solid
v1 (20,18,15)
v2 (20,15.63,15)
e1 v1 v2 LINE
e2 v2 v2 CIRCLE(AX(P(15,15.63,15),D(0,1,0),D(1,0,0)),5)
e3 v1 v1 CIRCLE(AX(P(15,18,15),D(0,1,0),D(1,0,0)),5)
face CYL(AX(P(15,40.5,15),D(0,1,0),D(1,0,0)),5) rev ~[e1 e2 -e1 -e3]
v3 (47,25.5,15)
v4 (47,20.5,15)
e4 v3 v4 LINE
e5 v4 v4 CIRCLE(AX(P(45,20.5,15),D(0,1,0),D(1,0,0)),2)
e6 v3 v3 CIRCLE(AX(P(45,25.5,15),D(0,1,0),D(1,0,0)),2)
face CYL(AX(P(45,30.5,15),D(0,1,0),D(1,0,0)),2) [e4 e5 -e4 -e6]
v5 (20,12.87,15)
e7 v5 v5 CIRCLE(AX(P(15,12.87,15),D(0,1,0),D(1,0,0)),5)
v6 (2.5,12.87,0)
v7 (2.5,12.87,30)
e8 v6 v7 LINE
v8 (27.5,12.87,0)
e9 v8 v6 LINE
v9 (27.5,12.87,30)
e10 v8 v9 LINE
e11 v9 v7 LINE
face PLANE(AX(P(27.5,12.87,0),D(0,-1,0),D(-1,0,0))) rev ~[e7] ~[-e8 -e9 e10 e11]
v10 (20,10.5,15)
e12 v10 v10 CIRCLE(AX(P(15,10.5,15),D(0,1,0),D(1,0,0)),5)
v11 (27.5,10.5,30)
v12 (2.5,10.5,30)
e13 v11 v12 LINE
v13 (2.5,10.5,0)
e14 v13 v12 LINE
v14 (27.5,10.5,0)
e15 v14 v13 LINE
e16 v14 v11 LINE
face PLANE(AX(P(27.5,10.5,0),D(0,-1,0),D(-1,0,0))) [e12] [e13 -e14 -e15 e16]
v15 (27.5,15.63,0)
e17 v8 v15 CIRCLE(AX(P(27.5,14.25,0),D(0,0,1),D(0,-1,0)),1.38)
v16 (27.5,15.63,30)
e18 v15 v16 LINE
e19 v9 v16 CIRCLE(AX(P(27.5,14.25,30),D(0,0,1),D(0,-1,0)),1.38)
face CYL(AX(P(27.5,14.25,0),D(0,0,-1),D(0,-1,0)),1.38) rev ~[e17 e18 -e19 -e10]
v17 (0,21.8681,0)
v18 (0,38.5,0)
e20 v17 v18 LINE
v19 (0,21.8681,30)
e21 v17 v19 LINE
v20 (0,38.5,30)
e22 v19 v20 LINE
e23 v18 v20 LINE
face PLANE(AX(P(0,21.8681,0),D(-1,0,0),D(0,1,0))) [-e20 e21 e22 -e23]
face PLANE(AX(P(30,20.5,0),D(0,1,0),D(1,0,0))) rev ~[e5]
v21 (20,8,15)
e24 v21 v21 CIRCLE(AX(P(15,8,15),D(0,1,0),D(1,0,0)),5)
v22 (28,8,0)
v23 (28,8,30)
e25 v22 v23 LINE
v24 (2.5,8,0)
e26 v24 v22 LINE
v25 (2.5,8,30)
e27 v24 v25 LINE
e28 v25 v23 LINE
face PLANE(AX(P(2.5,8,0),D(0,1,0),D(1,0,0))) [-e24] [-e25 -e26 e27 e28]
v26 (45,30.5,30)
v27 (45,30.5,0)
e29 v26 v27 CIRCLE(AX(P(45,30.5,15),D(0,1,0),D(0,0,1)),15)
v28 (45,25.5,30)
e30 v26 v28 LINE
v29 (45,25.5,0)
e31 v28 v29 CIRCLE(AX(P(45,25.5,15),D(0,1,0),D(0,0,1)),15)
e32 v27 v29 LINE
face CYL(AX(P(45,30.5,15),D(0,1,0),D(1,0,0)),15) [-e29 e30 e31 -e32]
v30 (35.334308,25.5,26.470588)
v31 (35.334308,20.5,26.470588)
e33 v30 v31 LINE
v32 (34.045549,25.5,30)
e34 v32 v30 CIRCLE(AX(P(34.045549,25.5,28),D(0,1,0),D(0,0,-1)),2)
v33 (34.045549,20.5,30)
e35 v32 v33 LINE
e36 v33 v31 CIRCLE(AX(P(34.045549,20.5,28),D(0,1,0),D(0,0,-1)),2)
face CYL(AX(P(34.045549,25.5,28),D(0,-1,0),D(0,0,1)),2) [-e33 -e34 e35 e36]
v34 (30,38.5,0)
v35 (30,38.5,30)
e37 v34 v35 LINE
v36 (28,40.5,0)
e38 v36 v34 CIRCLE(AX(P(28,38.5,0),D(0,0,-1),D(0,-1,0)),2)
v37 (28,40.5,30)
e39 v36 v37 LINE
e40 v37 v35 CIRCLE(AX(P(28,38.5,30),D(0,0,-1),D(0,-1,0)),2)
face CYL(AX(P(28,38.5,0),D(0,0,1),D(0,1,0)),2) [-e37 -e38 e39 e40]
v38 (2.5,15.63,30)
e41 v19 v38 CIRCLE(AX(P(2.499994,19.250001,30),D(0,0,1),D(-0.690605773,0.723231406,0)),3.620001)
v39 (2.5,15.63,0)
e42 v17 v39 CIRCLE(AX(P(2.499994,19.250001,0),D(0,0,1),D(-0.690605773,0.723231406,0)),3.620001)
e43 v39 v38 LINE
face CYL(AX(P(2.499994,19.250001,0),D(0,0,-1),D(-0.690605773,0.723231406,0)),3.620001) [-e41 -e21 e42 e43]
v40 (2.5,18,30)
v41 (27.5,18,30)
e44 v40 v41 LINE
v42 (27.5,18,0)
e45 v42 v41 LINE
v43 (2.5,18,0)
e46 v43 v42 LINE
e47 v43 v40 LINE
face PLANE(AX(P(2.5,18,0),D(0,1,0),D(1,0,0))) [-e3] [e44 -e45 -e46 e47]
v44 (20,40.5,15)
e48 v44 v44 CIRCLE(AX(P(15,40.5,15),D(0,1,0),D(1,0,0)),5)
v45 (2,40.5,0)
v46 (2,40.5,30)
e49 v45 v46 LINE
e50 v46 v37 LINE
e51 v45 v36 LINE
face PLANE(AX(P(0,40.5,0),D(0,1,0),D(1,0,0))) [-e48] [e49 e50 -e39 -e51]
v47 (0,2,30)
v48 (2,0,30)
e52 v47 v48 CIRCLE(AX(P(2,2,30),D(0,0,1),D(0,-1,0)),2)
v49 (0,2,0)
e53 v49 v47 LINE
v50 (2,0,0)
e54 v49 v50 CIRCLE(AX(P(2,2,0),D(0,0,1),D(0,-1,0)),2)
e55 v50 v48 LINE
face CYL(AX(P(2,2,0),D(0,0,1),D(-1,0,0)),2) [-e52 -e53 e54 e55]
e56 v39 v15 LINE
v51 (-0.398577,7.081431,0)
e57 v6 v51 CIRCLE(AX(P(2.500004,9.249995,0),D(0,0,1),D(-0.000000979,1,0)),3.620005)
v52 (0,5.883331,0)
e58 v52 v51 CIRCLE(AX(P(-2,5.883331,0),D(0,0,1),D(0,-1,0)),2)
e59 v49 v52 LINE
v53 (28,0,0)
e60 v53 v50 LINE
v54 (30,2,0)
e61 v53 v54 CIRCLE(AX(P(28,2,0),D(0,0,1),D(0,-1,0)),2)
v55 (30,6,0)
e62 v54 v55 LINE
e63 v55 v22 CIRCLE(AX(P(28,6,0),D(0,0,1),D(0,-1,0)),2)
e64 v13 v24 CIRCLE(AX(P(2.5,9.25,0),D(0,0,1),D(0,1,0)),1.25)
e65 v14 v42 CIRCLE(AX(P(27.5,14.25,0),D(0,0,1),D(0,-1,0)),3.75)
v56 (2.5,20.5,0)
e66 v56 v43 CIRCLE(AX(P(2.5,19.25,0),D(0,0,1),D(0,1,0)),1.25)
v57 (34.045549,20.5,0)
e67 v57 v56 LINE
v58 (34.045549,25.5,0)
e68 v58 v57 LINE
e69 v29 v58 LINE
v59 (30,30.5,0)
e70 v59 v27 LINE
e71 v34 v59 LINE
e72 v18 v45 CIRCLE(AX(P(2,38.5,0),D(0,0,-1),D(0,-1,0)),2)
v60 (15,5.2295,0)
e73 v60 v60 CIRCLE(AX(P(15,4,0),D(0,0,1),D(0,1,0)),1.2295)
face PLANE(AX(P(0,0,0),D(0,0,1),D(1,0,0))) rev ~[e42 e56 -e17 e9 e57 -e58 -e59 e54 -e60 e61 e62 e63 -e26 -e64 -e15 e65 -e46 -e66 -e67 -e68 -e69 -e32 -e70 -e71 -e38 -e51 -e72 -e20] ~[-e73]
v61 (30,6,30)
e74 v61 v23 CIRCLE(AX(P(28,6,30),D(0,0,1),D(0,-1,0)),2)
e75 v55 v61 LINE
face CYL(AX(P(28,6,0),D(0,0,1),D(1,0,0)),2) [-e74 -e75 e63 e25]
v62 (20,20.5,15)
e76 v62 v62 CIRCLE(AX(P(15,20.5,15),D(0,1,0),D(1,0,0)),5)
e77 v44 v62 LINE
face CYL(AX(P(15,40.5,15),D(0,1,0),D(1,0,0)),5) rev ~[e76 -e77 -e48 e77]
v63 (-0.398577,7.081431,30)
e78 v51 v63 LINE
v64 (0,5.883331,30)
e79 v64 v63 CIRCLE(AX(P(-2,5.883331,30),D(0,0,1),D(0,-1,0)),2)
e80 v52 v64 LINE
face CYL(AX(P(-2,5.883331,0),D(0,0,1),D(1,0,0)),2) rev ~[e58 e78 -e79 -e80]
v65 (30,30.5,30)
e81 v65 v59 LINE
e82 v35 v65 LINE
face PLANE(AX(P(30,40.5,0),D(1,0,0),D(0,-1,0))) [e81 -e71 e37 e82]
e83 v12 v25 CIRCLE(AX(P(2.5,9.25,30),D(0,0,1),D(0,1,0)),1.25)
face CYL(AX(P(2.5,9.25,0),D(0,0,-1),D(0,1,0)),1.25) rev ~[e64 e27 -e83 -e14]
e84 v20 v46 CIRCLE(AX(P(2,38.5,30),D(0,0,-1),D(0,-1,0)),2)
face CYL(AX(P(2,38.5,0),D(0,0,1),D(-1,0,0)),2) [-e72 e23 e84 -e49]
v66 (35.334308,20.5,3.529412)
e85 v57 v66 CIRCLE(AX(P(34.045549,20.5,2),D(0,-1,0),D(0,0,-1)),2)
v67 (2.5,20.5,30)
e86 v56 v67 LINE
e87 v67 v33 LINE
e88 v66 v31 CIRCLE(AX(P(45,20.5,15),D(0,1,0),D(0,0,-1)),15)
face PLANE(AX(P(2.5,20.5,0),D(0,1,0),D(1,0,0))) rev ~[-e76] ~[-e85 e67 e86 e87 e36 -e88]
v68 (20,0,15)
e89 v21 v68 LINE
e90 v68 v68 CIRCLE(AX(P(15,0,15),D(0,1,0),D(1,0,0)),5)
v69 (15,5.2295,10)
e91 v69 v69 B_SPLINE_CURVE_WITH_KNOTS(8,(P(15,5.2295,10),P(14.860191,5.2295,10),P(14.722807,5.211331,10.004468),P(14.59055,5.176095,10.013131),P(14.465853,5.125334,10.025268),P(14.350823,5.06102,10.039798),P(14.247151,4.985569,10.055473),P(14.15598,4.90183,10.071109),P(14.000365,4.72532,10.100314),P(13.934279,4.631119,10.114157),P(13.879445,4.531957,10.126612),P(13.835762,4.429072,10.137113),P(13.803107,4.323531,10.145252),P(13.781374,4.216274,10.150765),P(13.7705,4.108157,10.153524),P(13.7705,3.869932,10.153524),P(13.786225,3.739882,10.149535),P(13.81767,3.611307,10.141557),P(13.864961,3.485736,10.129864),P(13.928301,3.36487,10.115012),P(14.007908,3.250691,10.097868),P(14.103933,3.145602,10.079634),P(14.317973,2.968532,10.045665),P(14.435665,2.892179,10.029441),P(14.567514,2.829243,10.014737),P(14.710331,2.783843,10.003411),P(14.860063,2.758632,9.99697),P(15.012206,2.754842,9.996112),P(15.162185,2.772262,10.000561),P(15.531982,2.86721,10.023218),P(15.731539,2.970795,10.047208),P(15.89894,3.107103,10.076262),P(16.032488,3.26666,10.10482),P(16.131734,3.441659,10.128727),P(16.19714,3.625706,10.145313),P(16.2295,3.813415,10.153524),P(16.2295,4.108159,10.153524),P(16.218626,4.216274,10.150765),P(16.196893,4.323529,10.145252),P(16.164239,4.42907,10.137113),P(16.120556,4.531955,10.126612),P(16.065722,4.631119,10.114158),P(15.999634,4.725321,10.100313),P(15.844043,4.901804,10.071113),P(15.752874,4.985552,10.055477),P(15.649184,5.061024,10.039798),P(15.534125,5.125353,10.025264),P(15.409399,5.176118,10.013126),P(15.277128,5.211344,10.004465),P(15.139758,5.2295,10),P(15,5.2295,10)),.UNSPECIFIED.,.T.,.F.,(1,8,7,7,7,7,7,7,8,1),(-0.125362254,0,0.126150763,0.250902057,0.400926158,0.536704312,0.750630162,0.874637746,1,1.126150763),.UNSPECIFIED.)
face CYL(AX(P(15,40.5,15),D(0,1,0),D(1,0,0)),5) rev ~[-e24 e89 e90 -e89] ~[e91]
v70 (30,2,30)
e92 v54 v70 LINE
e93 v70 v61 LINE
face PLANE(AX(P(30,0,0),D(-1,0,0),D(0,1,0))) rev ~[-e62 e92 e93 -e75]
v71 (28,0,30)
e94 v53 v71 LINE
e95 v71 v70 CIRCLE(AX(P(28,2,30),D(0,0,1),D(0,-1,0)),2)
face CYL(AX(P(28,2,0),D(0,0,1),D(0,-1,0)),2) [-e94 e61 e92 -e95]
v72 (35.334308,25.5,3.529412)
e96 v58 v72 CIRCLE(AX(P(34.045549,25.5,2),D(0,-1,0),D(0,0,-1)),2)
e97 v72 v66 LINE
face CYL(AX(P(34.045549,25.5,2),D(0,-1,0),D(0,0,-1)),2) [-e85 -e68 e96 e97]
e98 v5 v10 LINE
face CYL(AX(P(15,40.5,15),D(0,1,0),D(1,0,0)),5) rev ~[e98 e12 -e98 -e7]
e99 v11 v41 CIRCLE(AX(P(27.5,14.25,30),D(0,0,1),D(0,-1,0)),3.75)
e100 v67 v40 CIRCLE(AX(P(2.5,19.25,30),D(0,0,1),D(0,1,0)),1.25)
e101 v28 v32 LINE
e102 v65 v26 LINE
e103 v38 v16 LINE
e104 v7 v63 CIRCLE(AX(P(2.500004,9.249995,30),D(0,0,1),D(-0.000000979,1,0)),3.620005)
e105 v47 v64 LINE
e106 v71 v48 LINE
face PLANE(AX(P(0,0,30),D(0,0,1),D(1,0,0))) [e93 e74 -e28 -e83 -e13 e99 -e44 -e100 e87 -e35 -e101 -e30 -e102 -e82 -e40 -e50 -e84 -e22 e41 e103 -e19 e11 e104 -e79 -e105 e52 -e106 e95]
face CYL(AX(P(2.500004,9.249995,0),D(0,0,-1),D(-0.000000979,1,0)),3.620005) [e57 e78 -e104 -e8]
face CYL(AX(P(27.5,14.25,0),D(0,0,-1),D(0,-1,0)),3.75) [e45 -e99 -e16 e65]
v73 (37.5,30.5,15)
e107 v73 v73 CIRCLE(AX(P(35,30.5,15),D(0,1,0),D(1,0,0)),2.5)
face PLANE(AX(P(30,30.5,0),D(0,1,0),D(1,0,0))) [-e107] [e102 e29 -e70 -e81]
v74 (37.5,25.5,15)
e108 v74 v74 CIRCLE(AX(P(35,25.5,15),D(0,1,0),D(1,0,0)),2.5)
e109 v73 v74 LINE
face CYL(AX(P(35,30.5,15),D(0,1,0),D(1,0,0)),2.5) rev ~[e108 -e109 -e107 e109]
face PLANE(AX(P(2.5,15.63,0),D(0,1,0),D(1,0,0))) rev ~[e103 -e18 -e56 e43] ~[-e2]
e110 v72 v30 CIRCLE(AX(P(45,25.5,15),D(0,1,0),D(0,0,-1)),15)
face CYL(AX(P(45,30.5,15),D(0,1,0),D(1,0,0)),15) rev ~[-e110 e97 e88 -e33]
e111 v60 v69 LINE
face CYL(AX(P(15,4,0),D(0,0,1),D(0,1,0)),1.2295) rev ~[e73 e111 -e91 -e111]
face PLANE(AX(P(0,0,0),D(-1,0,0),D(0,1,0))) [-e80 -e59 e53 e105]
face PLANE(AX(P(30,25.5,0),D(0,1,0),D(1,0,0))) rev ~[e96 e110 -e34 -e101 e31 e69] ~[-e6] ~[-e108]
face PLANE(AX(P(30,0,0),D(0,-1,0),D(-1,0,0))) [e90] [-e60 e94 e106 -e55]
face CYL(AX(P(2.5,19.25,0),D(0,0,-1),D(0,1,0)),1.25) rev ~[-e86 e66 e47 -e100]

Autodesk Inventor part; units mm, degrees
ref_plane "YZ Plane" through (0, 0, 0) normal (1, 0, 0) x (0, 1, 0)
ref_plane "XZ Plane" through (0, 0, 0) normal (0, 1, 0) x (-1, 0, 0)
ref_plane "XY Plane" through (0, 0, 0) normal (0, 0, 1) x (1, 0, 0)
sketch "Skizze3" plane through (0, 0, 0) normal (0, 0, 1) x (1, 0, 0)
  line L0 (0, 0) -> (0, 8)
  line L1 (0, 8) -> (30, 8)
  line L2 (30, 0) -> (0, 0)
  arc A0 (2.5, 21.75) -> (2.5, 16.75) centre (2.5, 19.25) ccw construction
  arc A1 (27.5, 11.75) -> (27.5, 16.75) centre (27.5, 14.25) ccw construction
  line L3 (27.5, 16.75) -> (2.5, 16.75) construction
  line L4 (2.5, 11.75) -> (27.5, 11.75) construction
  arc A2 (2.5, 11.75) -> (0.3349, 8) centre (2.5, 9.25) ccw construction
  line L5 (0, 20.5) -> (0, 40.5)
  line L6 (0, 40.5) -> (30, 40.5)
  arc A3 (0, 21.8681) -> (2.5, 15.63) centre (2.5, 19.25) ccw
  line L7 (2.5, 15.63) -> (27.5, 15.63)
  arc A4 (27.5, 12.87) -> (27.5, 15.63) centre (27.5, 14.25) ccw
  line L8 (27.5, 12.87) -> (2.5, 12.87)
  arc A5 (2.5, 12.87) -> (0, 6.6319) centre (2.5, 9.25) ccw
  arc A6 (2.5, 20.5) -> (2.5, 18) centre (2.5, 19.25) ccw
  line L9 (2.5, 18) -> (27.5, 18)
  arc A7 (27.5, 10.5) -> (27.5, 18) centre (27.5, 14.25) ccw
  line L10 (27.5, 10.5) -> (2.5, 10.5)
  arc A8 (2.5, 10.5) -> (2.5, 8) centre (2.5, 9.25) ccw
  line L11 (0, 20.5) -> (30, 20.5)
  line L12 (30, 20.5) -> (30, 20.5)
  line L13 (30, 20.5) -> (30, 30.5)
  line L14 (30, 40.5) -> (30, 30.5)
  line L15 (30, 0) -> (30, 8)
  line L16 (30, 30.5) -> (60, 30.5)
  line L17 (60, 30.5) -> (60, 25.5)
  line L18 (30, 25.5) -> (60, 25.5)
  point P0 (15, 4)
  point P1 (0, 4)
  point P2 (15, 0)
  point P3 (30, 30.5)
  dimension "d4" = 8
  dimension "d11" = 5
  dimension "d12" = 5
  dimension "d17" = 5
  dimension "d19" = 1.12
  dimension "d20" = 1.25
  dimension "d22" = 20
  dimension "d23" = 30
  dimension "d54" = 30
  dimension "d71" = 5
  dimension "d72" = 5
  dimension "d73" = 30
extrude "Extrusion3" add sketch "Skizze3" along normal blind 30
sketch "Skizze4" plane through (30, 30.5, 0) normal (0, 1, 0) x (1, 0, 0)
  circle A0 centre (15, -15) radius 2
  circle A1 centre (5, -15) radius 2.5
  circle A2 centre (15, -15) radius 15
  line L0 (30, 0) -> (0, 0) projected
  line L1 (0, 0) -> (0, -30) projected
  line L2 (30, -30) -> (0, -30) projected
  line L3 (30, 0) -> (30, -30) projected
  circle A3 centre (15, -15) radius 15
  line L4 (0, 0) -> (0, -30) projected
  point P0 (0, -18)
  point P1 (25, -18)
  point P2 (24, -15)
  point P3 (29.5215, -11.2415)
  point P4 (-20, -18)
  point P5 (10.3125, -7.5196)
  point P6 (10.3125, -12.4804)
  point P7 (30, -15)
  point P8 (15, 0)
  point P9 (15, -30)
  point P10 (0, -15)
  point P11 (15, 0)
  point P12 (15, -30)
  dimension "d36" = 5
  dimension "d75" = 10
  dimension "d76" = 4
sketch "Skizze6" plane through (0, 40.5, 0) normal (0, 1, 0) x (1, 0, 0)
  circle A0 centre (15, -15) radius 5
  line L0 (30, -30) -> (0, -30) projected
  line L1 (0, 0) -> (0, -30) projected
  point P0 (15, -30)
  point P1 (0, -15)
  dimension "d51" = 10
extrude "Extrusion9" cut sketch "Skizze6" against normal through all
extrude "Extrusion6" cut sketch "Skizze4" against normal through all contours A1 | L3 L2 A2 | A2 L0 L3
extrude "Extrusion7" add sketch "Skizze4" against normal blind 10 contours A0 | A2 L1 L0 | L2 L1 A2
hole "Bohrung1" at (15, 4, 0) direction (0, 0, 1) diameter 2.459 end up to surface thread size "M3x0.5" class "6H" standard "ISO Metric profile"
fillet "Rundung3" radius 2 8 edges at (0, 40.5, 15) (30, 40.5, 15) (30, 0, 15) (30, 8, 15) (0, 0, 15) (0, 6.6319, 15) (45, 23, 0) (45, 23, 30)
equation "\"d12\" = d11"
properties part number "BT505_trajan20_22" material "Kunststoff, undurchsichtig Weiß"
